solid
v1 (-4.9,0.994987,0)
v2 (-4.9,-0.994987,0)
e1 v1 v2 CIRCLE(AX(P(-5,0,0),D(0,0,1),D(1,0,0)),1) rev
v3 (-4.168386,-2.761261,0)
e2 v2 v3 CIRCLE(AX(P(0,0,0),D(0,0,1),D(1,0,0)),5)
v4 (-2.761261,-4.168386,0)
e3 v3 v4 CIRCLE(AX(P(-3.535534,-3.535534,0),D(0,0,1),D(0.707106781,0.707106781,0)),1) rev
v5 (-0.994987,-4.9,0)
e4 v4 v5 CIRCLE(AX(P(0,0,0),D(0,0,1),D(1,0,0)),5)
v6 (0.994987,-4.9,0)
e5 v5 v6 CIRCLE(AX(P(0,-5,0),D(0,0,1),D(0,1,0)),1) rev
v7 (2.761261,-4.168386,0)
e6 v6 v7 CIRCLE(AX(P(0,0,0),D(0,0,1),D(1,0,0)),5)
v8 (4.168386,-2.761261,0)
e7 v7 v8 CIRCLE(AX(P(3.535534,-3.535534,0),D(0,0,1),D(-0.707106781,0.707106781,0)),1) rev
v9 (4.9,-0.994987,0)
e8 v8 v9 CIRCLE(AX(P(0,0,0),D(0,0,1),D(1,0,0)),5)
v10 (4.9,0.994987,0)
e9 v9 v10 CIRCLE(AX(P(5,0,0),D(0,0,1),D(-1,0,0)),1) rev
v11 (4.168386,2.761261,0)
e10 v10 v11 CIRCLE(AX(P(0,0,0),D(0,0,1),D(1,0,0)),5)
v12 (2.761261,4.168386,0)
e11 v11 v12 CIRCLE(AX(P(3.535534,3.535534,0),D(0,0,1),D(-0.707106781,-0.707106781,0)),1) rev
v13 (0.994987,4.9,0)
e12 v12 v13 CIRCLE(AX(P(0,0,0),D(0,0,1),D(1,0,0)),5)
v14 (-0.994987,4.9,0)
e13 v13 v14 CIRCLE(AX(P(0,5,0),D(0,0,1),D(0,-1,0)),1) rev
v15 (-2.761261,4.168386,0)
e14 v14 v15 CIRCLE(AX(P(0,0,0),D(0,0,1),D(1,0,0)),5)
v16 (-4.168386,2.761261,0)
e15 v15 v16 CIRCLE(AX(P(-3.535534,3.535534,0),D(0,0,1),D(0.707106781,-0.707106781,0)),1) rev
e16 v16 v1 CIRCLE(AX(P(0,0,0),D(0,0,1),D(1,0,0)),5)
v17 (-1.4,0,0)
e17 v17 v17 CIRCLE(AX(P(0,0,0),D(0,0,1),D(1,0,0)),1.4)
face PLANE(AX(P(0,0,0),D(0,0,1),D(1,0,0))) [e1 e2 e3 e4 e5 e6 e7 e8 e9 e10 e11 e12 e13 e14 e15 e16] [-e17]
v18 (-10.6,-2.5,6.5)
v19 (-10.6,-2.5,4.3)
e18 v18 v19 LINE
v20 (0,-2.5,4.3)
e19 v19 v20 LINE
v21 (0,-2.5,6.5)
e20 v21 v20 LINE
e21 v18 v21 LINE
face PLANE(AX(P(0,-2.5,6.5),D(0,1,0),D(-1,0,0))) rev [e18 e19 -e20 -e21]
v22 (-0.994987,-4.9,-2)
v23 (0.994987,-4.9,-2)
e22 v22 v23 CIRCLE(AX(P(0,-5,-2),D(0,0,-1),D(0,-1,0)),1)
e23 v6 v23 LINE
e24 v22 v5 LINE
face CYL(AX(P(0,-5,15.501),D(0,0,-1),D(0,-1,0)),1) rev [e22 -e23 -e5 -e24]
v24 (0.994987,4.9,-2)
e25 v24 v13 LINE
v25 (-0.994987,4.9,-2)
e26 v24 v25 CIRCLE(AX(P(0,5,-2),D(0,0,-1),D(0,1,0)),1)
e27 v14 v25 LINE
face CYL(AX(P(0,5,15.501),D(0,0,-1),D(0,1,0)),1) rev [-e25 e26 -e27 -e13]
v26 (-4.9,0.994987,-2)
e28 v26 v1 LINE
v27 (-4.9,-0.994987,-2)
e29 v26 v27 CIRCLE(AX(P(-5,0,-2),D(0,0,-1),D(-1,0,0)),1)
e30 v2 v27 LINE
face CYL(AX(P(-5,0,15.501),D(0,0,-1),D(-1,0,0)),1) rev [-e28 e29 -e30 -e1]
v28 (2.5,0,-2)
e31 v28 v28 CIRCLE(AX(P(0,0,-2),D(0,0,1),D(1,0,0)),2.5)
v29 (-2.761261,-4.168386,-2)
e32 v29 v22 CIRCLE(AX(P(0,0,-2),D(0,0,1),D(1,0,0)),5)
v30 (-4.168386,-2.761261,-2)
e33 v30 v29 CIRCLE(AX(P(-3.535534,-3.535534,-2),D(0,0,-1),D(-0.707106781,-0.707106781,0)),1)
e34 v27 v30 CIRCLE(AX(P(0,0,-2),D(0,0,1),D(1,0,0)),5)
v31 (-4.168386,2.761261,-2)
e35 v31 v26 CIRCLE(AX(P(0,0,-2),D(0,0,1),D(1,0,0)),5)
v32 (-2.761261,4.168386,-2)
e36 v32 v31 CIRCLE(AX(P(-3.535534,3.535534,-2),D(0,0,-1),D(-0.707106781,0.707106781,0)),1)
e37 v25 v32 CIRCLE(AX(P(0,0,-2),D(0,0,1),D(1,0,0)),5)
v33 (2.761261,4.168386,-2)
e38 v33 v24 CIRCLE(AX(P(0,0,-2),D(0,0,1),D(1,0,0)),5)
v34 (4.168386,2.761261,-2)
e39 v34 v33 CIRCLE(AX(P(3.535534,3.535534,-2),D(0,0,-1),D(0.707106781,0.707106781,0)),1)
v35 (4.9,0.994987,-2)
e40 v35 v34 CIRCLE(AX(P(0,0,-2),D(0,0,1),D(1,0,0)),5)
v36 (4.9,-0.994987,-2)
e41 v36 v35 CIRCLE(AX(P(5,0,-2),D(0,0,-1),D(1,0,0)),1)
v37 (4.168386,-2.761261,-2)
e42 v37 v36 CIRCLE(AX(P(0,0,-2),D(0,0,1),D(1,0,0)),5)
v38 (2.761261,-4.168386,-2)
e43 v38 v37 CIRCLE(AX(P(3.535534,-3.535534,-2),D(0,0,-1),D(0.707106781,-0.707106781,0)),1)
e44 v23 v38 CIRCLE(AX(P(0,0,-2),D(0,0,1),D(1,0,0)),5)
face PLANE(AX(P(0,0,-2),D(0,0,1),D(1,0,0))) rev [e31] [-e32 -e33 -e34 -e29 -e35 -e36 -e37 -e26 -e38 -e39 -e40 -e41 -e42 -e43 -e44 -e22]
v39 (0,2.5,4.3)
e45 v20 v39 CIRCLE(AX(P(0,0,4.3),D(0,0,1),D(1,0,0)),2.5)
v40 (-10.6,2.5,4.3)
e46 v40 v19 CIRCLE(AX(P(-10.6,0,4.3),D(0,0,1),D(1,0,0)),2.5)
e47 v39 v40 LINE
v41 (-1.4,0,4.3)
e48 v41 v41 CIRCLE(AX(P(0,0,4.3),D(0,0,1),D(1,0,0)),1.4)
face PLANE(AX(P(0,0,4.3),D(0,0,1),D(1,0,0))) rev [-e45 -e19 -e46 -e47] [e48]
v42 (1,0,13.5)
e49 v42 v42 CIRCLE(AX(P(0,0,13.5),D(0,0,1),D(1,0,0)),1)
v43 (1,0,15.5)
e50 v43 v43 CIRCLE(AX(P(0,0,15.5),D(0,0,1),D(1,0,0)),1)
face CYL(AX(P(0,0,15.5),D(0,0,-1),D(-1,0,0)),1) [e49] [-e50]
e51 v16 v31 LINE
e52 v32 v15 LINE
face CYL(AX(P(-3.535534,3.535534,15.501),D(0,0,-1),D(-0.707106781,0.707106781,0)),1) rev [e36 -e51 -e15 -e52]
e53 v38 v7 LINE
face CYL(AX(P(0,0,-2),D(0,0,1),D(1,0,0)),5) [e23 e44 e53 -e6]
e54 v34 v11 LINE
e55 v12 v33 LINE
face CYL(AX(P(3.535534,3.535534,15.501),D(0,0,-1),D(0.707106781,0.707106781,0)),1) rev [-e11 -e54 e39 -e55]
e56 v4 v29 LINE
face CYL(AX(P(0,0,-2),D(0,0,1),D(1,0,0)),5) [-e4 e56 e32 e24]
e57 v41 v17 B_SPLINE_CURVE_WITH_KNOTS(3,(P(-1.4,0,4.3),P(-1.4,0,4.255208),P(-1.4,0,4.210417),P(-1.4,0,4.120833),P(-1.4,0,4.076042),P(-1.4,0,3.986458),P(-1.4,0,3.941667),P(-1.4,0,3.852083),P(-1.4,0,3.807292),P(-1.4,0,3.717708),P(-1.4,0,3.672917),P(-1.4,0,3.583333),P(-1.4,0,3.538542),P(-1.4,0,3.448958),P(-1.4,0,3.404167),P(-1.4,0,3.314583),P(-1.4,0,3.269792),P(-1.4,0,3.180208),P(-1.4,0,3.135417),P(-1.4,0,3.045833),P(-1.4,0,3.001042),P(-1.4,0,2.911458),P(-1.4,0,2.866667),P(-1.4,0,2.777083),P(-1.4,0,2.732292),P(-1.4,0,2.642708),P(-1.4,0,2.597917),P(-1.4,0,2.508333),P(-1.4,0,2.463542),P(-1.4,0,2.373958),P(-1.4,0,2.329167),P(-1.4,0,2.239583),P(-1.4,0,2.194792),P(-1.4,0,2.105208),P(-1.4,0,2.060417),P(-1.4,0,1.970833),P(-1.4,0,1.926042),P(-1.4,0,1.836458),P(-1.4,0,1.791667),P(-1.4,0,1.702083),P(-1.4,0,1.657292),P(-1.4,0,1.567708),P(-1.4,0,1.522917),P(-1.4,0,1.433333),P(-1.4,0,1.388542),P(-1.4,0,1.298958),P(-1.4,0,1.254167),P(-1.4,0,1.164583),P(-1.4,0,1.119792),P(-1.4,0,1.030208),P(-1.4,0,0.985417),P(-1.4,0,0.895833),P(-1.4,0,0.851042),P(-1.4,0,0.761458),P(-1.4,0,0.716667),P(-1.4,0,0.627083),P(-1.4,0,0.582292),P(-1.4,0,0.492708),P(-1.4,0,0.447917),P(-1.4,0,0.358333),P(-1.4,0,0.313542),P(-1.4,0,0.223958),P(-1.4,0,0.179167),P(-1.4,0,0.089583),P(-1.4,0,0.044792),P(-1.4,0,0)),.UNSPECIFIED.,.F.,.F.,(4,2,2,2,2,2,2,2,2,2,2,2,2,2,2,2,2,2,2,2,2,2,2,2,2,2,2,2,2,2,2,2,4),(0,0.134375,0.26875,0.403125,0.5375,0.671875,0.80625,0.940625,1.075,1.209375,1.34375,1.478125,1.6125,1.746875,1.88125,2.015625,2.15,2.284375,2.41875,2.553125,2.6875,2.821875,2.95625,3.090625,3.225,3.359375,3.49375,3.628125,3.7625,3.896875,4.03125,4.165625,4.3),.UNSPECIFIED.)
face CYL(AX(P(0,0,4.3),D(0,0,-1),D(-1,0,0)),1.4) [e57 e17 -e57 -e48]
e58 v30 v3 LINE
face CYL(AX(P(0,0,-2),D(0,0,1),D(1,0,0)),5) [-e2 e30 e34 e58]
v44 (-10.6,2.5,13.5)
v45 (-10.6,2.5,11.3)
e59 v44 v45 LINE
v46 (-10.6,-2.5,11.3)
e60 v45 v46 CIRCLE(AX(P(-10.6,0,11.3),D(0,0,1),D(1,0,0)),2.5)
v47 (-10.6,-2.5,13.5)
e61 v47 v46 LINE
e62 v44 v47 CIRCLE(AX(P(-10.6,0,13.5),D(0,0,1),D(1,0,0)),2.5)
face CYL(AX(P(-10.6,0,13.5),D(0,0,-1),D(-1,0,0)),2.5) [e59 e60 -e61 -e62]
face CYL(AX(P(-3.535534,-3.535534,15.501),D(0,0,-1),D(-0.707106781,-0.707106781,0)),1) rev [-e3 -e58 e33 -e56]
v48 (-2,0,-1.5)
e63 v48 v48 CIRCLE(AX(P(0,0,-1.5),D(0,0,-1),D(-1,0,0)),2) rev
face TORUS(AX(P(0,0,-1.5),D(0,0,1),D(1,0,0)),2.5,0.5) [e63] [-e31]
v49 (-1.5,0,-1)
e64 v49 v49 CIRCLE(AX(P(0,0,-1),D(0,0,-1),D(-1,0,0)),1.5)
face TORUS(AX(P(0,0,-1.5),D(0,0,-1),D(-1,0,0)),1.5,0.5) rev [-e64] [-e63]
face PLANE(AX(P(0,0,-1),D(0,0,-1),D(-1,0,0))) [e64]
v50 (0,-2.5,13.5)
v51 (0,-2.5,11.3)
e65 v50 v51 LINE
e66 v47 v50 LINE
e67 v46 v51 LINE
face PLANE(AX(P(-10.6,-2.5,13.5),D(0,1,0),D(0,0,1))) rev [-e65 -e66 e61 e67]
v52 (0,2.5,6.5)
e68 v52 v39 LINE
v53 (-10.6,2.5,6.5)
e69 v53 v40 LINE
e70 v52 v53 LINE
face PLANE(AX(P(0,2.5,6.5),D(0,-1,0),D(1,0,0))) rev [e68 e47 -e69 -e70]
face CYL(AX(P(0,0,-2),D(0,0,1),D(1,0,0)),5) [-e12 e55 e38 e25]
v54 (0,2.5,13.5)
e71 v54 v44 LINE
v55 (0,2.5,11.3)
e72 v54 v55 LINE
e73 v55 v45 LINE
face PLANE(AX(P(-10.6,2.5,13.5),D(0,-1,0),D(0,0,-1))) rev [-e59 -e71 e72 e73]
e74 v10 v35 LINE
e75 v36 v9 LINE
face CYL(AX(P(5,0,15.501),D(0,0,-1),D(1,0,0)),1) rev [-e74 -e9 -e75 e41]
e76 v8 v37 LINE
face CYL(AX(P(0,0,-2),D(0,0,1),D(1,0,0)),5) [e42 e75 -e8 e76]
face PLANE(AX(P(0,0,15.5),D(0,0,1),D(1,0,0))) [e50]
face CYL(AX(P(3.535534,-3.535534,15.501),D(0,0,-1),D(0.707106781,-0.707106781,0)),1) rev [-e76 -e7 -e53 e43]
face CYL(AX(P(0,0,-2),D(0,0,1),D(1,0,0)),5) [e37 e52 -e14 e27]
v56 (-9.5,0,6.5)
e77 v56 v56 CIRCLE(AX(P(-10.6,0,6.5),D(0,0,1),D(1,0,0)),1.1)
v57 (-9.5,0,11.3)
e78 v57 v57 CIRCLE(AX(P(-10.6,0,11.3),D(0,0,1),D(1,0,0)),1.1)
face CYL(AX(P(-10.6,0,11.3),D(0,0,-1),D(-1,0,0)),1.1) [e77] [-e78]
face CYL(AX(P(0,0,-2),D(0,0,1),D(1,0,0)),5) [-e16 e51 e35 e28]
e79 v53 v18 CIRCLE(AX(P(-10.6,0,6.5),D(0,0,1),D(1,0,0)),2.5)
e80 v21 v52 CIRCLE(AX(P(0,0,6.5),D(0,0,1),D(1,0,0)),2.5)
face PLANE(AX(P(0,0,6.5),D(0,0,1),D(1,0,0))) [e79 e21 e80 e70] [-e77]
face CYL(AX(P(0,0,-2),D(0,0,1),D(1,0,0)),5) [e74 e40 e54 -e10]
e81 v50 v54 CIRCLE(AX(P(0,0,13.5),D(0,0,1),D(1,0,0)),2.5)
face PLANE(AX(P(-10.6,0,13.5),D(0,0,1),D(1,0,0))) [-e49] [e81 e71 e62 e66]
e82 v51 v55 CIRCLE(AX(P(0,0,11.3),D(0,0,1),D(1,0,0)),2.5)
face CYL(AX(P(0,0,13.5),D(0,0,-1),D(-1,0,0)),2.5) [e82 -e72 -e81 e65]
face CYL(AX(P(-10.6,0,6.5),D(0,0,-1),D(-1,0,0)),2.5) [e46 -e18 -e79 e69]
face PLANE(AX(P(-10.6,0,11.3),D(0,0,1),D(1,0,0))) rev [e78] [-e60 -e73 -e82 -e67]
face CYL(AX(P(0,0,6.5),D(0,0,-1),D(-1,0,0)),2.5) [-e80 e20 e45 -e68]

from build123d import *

# Parameters (mm, degrees)
SKETCH1_R           = 5
BOSS_EXTRUDE1_DEPTH = 2
SKETCH2_R           = 1.4
BOSS_EXTRUDE2_DEPTH = 4.3
BOSS_EXTRUDE3_DEPTH = 2.2
SKETCH4_R           = 1.1
BOSS_EXTRUDE4_DEPTH = 4.8
BOSS_EXTRUDE7_DEPTH = 2.2
SKETCH8_R           = 1
BOSS_EXTRUDE8_DEPTH = 2
CUT_EXTRUDE1_REACH  = 24.425
SKETCH9_R           = 1
CIRPATTERN1_COUNT   = 8
SKETCH10_R          = 2
CUT_EXTRUDE3_DEPTH  = 1
FILLET6_R           = 0.5


with BuildPart() as part:
    # Sketch1 → Boss-Extrude1 (new body)
    with BuildSketch(Plane.XY):
        Circle(SKETCH1_R)
    extrude(amount=-BOSS_EXTRUDE1_DEPTH)

    # Sketch2 → Boss-Extrude2 (add)
    with BuildSketch(Plane.XY):
        with Locations(Location((0, 0, 0), (0, 0, 180))):
            Circle(SKETCH2_R)
    extrude(amount=BOSS_EXTRUDE2_DEPTH)

    # Sketch3 → Boss-Extrude3 (add)
    with BuildSketch(Plane.XY.offset(4.3)):
        with BuildLine():
            Line((0, -2.5), (-10.6, -2.5))
            ThreePointArc((-10.6, -2.5), (-13.1, 0), (-10.6, 2.5))
            Line((-10.6, 2.5), (0, 2.5))
            ThreePointArc((0, 2.5), (2.5, 0), (0, -2.5))
        make_face()
    extrude(amount=BOSS_EXTRUDE3_DEPTH)

    # Sketch4 → Boss-Extrude4 (add)
    with BuildSketch(Plane.XY.offset(6.5)):
        with Locations((-10.6, 0)):
            Circle(SKETCH4_R)
    extrude(amount=BOSS_EXTRUDE4_DEPTH)

    # Sketch7 → Boss-Extrude7 (add)
    with BuildSketch(Plane.XY.offset(11.3)):
        with BuildLine():
            Line((-10.6, 2.5), (0, 2.5))
            ThreePointArc((0, 2.5), (2.5, 0), (0, -2.5))
            Line((0, -2.5), (-10.6, -2.5))
            ThreePointArc((-10.6, -2.5), (-13.1, 0), (-10.6, 2.5))
        make_face()
    extrude(amount=BOSS_EXTRUDE7_DEPTH)

    # Sketch8 → Boss-Extrude8 (add)
    with BuildSketch(Plane.XY.offset(13.5)):
        Circle(SKETCH8_R)
    extrude(amount=BOSS_EXTRUDE8_DEPTH)

    # Sketch9 → Cut-Extrude1 (cut, up to next)
    with BuildSketch(Plane(origin=(0, 0, -2), x_dir=(-1, 0, 0), z_dir=(0, 0, -1)), mode=Mode.PRIVATE) as cut_extrude1_sk1:
        with Locations((5, 0)):
            Circle(SKETCH9_R)
    cut_extrude1_tool1 = extrude(cut_extrude1_sk1.sketch, amount=-CUT_EXTRUDE1_REACH, mode=Mode.PRIVATE) & part.part
    cut_extrude1 = cut_extrude1_tool1.solids().sort_by_distance((-5, 0, -2))[0]
    add(cut_extrude1, mode=Mode.SUBTRACT)

    # CirPattern1: Cut-Extrude1 ×8 about axis
    cirpattern1_axis = Axis((0, 0, 0), (0, 0, 1))
    for i in range(1, CIRPATTERN1_COUNT):
        add(cut_extrude1.rotate(cirpattern1_axis, i * 360 / CIRPATTERN1_COUNT), mode=Mode.SUBTRACT)

    # Sketch10 → Cut-Extrude3 (cut)
    with BuildSketch(Plane(origin=(0, 0, -2), x_dir=(-1, 0, 0), z_dir=(0, 0, -1))):
        Circle(SKETCH10_R)
    extrude(amount=-CUT_EXTRUDE3_DEPTH, mode=Mode.SUBTRACT)

    # Fillet6
    fillet6_edges = [part.edges().sort_by_distance(p)[0] for p in [
        (2, 0, -1),
        (2, 0, -2),
    ]]
    fillet(fillet6_edges, radius=FILLET6_R - 0.0001)  # a hair under: the kernel refuses the full size


solid = part.part
